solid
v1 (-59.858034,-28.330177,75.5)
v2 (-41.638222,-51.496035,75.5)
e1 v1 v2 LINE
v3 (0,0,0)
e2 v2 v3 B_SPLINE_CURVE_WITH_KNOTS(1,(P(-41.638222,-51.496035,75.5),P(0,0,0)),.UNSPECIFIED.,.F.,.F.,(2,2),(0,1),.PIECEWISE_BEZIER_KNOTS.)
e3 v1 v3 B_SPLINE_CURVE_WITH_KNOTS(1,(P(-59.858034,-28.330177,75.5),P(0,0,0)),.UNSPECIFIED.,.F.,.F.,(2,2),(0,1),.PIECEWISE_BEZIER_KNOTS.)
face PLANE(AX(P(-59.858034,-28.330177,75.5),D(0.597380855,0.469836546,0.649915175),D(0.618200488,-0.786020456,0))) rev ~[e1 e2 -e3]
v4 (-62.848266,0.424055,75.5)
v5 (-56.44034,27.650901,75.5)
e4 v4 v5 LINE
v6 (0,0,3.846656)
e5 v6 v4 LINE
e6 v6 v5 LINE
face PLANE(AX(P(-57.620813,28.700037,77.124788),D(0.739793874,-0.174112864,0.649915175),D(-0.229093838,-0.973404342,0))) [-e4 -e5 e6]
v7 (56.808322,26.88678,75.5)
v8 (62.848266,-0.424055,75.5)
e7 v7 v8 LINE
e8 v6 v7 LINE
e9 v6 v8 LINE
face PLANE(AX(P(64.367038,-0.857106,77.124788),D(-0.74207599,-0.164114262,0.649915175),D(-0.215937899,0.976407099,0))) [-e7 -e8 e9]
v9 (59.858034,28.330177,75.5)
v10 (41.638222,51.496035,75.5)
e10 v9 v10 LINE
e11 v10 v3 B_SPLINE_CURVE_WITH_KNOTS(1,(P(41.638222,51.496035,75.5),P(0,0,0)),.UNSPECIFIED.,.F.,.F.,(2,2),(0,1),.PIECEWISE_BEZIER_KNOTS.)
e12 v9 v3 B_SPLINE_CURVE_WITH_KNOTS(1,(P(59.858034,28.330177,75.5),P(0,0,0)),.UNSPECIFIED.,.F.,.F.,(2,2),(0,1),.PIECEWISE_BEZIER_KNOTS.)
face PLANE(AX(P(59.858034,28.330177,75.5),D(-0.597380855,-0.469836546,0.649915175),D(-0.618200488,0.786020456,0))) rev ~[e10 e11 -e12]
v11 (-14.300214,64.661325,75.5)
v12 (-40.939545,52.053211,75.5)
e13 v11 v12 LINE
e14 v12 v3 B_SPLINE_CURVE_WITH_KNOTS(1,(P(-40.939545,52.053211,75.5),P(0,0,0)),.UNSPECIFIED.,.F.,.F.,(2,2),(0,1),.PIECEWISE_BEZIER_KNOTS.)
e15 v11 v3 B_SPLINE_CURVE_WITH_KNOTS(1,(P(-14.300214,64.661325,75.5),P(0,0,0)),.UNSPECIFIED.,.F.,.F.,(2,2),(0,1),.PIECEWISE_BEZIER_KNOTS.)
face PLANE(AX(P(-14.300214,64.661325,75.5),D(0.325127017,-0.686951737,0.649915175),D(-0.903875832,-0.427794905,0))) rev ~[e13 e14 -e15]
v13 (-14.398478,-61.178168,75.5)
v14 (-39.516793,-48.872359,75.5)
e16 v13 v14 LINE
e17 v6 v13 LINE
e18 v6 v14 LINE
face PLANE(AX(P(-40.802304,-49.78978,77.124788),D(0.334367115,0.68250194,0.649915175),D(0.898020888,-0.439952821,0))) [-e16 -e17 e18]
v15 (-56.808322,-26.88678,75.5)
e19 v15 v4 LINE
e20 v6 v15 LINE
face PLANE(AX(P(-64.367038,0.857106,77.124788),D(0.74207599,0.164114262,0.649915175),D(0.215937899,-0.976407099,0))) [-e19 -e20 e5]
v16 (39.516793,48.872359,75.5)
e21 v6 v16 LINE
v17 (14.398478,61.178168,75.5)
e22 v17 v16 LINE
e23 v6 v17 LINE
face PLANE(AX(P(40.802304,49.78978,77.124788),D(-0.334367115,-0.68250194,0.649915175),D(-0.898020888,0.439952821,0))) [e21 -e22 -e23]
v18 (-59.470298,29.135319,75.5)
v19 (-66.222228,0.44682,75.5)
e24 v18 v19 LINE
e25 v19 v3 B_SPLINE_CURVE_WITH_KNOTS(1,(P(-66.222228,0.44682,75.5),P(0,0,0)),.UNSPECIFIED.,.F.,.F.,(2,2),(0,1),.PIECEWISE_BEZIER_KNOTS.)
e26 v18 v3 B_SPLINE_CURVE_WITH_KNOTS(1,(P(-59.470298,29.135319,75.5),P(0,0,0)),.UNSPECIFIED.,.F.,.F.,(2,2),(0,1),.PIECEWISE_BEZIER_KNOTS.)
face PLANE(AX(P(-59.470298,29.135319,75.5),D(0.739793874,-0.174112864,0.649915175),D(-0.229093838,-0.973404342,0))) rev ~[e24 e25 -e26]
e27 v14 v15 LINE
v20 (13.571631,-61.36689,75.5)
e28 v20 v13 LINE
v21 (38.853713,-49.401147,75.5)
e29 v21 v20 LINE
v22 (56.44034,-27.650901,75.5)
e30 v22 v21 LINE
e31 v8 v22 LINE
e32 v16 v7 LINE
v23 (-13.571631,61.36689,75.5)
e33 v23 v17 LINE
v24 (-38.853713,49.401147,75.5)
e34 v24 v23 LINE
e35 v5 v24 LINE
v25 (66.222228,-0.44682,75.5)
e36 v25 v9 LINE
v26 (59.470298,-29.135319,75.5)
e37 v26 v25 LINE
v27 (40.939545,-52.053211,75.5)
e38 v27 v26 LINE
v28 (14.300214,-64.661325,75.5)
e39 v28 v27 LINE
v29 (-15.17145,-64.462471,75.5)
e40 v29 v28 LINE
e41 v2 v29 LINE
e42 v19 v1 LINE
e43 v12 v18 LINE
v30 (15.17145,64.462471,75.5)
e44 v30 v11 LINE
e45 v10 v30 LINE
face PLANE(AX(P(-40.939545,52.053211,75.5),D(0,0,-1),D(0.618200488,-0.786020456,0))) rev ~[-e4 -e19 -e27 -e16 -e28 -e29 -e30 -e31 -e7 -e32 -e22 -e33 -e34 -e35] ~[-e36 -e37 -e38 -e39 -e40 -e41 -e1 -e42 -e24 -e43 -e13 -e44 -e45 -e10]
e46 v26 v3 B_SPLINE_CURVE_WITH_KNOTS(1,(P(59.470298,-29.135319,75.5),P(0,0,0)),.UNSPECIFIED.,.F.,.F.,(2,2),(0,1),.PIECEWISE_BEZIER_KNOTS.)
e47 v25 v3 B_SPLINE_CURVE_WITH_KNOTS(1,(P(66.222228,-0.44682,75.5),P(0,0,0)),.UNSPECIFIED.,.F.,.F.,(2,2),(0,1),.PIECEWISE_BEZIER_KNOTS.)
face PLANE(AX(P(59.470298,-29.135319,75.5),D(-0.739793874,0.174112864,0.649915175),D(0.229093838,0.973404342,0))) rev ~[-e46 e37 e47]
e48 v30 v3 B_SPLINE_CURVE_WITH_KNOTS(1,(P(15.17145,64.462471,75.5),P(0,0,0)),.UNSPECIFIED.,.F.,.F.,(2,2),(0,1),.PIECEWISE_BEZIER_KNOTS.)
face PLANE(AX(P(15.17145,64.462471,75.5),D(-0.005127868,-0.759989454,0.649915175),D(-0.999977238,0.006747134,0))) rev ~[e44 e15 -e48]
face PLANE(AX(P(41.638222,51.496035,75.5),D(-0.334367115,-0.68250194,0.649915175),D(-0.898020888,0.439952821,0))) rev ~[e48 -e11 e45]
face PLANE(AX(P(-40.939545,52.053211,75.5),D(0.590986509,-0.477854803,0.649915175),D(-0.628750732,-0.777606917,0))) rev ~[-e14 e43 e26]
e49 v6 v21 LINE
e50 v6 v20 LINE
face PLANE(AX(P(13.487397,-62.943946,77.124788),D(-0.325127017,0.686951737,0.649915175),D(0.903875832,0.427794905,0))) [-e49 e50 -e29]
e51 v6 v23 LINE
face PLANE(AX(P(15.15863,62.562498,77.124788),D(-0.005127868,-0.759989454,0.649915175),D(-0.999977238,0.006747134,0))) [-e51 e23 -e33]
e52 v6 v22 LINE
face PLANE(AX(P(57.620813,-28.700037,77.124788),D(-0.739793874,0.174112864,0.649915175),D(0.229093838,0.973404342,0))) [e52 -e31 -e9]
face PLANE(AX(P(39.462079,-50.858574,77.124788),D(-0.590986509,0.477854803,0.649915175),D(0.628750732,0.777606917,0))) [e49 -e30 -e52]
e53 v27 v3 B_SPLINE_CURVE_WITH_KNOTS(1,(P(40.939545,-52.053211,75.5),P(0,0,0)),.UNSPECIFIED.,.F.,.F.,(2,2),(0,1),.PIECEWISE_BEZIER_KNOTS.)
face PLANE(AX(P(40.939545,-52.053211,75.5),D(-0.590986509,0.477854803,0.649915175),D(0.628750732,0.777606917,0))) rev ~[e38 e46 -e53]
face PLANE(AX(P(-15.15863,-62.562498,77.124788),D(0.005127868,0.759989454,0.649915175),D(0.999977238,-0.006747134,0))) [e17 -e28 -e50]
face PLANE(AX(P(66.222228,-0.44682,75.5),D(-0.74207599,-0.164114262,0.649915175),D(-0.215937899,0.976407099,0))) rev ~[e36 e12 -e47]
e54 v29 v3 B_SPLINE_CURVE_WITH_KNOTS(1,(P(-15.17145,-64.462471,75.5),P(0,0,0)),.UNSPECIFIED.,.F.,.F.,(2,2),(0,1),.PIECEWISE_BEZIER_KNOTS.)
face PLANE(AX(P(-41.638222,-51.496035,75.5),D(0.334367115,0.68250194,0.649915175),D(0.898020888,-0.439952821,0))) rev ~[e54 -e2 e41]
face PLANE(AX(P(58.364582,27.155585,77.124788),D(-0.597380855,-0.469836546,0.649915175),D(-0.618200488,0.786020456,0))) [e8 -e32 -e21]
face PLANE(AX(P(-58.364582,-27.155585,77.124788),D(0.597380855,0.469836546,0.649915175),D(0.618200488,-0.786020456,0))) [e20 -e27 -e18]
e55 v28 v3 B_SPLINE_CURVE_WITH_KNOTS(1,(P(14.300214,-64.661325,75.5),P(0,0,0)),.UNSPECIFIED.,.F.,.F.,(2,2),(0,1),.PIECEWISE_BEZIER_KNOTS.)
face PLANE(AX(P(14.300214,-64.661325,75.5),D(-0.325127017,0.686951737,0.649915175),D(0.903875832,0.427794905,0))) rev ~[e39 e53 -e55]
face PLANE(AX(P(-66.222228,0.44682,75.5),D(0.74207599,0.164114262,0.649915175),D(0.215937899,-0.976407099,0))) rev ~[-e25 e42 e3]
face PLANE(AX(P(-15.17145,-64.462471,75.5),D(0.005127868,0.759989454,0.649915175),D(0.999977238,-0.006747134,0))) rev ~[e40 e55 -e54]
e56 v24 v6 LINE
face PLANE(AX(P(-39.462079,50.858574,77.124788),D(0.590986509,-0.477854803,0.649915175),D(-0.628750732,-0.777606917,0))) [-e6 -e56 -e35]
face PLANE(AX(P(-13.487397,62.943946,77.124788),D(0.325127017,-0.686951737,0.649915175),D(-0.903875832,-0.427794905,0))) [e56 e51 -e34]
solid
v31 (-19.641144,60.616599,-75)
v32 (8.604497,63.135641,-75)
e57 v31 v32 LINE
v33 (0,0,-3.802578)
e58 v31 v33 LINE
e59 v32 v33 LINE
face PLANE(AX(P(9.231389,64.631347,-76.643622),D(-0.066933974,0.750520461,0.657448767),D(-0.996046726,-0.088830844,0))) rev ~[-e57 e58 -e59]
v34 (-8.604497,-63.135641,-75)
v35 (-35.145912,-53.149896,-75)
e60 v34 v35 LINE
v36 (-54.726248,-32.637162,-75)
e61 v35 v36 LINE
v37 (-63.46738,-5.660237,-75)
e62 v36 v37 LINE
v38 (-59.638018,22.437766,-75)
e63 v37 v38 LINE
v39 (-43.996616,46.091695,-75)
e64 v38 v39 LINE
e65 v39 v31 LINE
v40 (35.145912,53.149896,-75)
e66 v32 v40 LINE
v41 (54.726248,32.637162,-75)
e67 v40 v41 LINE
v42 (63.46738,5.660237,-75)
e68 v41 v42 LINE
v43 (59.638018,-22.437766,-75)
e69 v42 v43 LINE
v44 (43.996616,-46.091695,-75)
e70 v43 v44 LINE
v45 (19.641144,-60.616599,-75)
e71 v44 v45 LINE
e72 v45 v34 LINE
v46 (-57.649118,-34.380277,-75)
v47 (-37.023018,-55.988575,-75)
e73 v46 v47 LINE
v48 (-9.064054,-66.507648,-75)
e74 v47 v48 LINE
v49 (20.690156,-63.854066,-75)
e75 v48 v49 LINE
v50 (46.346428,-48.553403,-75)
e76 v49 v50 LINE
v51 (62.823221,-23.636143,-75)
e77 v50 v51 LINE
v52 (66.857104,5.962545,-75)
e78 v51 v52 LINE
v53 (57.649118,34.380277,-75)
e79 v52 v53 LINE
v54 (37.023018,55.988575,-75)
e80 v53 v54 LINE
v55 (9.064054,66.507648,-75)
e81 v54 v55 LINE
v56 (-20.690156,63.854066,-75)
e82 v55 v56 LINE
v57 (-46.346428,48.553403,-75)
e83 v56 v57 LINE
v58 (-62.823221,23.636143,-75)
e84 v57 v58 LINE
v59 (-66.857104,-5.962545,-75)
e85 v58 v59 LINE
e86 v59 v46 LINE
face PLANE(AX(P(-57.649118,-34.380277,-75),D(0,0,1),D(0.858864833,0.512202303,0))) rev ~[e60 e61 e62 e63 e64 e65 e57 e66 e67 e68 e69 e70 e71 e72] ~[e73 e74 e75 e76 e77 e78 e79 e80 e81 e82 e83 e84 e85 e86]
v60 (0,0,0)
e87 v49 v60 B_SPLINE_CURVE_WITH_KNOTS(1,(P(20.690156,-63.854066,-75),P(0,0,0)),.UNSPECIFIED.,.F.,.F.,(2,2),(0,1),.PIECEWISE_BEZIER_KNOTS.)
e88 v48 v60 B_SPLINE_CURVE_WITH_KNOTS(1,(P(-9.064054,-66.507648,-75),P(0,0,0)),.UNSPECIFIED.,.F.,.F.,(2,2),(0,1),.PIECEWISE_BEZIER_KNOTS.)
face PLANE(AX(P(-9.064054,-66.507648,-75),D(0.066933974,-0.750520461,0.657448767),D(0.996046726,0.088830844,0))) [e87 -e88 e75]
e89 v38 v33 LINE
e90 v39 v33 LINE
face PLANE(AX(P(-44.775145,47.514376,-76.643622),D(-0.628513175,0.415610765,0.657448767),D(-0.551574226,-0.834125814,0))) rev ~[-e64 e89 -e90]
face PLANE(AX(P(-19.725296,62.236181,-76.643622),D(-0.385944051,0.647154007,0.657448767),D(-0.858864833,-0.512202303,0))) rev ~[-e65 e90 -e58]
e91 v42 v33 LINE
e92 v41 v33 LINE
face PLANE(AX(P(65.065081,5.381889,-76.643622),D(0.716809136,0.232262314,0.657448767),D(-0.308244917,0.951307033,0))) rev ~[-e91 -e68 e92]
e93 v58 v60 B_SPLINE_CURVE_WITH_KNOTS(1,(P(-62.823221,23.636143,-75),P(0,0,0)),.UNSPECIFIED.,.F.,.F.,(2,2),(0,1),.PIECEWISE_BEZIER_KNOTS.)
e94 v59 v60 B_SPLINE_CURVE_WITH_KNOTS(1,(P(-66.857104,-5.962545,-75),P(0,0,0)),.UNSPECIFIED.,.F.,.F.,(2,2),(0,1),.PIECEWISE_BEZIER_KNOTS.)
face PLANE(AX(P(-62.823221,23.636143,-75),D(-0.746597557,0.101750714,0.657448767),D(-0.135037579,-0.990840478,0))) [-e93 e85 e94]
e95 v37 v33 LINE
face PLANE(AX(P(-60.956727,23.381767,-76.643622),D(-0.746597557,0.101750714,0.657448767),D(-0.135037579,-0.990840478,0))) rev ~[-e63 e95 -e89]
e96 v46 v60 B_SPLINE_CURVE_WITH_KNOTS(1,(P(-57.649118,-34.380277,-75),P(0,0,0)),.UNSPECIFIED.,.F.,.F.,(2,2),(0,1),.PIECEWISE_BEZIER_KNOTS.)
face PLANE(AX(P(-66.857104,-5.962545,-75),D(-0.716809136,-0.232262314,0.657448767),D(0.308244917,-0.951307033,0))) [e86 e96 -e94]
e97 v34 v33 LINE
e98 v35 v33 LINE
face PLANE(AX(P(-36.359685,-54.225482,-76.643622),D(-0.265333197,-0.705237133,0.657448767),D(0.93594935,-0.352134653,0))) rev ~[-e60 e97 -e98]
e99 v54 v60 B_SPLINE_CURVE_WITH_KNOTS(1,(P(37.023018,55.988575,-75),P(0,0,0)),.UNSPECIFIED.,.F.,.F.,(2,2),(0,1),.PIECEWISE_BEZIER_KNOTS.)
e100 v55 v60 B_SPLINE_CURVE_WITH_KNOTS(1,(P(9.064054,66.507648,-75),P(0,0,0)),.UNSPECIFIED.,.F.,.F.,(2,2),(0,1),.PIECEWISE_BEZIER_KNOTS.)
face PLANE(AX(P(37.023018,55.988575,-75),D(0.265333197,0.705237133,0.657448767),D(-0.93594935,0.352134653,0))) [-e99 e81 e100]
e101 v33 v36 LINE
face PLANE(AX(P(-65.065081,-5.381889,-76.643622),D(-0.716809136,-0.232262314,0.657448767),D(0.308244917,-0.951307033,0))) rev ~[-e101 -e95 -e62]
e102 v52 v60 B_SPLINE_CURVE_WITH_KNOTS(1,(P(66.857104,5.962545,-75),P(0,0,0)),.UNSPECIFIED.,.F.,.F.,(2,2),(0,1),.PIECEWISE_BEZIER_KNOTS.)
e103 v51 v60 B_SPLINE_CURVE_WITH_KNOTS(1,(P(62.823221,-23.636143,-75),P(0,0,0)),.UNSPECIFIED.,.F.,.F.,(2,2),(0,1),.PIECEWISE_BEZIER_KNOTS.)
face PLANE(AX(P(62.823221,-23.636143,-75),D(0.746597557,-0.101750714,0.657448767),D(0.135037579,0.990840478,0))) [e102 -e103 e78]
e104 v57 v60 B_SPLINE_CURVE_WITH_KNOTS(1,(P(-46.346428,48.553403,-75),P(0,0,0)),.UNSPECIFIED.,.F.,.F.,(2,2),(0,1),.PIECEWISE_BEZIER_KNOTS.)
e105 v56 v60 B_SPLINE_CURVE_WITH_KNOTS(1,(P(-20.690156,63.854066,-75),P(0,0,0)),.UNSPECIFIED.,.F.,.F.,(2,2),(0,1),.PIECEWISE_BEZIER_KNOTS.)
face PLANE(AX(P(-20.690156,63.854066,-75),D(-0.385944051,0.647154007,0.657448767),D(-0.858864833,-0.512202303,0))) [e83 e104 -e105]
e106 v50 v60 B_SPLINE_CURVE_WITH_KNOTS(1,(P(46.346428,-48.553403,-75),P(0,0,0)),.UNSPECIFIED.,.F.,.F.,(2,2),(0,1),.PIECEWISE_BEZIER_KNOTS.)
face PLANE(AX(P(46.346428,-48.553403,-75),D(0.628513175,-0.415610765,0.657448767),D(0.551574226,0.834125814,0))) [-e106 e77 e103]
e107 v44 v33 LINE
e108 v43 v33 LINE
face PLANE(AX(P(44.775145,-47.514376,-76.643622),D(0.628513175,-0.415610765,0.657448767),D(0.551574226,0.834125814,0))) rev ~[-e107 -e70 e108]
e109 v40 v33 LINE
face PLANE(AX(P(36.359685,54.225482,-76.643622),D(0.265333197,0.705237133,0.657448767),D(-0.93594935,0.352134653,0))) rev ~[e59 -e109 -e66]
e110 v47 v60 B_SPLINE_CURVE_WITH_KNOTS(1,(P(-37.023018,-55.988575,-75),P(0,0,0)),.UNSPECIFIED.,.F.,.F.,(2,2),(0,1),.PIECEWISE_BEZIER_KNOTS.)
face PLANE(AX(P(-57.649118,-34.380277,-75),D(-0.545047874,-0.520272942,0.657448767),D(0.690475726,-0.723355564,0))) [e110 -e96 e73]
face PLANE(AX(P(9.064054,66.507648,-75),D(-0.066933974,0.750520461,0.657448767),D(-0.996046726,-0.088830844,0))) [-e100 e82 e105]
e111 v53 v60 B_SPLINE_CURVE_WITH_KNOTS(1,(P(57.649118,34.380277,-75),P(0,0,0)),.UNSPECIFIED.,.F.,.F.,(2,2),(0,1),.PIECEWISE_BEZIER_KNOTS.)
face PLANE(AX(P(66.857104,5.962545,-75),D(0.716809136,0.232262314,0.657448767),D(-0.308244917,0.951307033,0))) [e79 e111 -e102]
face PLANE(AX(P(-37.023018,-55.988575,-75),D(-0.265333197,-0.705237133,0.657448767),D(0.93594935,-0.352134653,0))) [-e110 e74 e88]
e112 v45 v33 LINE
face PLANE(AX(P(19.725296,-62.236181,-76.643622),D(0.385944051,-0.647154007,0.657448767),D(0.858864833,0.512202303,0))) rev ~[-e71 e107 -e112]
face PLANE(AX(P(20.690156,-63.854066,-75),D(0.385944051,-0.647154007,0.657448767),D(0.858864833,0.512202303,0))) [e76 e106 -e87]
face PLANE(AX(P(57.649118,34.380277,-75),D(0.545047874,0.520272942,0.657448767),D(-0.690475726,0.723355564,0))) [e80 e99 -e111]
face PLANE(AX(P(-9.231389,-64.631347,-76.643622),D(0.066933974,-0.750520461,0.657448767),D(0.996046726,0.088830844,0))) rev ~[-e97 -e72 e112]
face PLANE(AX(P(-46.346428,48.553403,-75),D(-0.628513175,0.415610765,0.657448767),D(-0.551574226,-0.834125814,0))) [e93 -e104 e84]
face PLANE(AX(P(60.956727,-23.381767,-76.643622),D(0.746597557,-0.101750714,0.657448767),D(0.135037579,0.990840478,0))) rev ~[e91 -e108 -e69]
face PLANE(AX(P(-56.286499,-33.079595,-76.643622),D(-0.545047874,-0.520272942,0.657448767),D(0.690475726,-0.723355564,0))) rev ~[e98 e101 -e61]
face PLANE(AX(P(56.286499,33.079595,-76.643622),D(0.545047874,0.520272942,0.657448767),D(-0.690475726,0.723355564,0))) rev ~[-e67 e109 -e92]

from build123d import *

# Parameters (mm, degrees)
F3_T = -2.5
F7_T = -2.5


# Not quite as in the source:
# - the program builds the solid bodies; features that only make, move or delete a surface that nothing else refers to are left out


with BuildPart() as f2:
    # F1 (on offset) → F2 section 0
    with BuildSketch(Plane.XY.offset(75.5), mode=Mode.PRIVATE) as f2_s0:
        Polygon((-40.9395454607, 52.0532105827), (-59.4702975669, 29.1353191471), (-66.2222278846, 0.4468204332), (-59.8580338074, -28.3301765474), (-41.6382220241, -51.496034616), (-15.1714497096, -64.4624714714), (14.3002142855, -64.6613252717), (40.9395454607, -52.0532105827), (59.4702975669, -29.1353191471), (66.2222278846, -0.4468204332), (59.8580338074, 28.3301765474), (41.6382220241, 51.496034616), (15.1714497096, 64.4624714714), (-14.3002142855, 64.6613252717), align=None)
    loft([f2_s0.sketch, Vertex(0, 0, 0)])

    # F3
    f3_openings = [f2.faces().sort_by_distance(p)[0] for p in [
        (0, 0, 75.5),
    ]]
    offset(amount=F3_T, openings=f3_openings)


with BuildPart() as f6:
    # F5 (on offset) → F6 section 0
    with BuildSketch(Plane.XY.offset(-75), mode=Mode.PRIVATE) as f6_s0:
        Polygon((-57.6491183851, -34.3802773844), (-37.0230176236, -55.9885746349), (-9.0640541642, -66.5076480243), (20.6901563858, -63.8540660596), (46.3464277154, -48.5534031931), (62.8232206344, -23.6361433558), (66.8571042305, 5.9625445514), (57.6491183851, 34.3802773844), (37.0230176236, 55.9885746349), (9.0640541642, 66.5076480243), (-20.6901563858, 63.8540660596), (-46.3464277154, 48.5534031931), (-62.8232206344, 23.6361433558), (-66.8571042305, -5.9625445514), align=None)
    loft([f6_s0.sketch, Vertex(0, 0, 0)])

    # F7
    f7_openings = [f6.faces().sort_by_distance(p)[0] for p in [
        (0, 0, -75),
    ]]
    offset(amount=F7_T, openings=f7_openings)


solid = Compound([f2.part, f6.part])
